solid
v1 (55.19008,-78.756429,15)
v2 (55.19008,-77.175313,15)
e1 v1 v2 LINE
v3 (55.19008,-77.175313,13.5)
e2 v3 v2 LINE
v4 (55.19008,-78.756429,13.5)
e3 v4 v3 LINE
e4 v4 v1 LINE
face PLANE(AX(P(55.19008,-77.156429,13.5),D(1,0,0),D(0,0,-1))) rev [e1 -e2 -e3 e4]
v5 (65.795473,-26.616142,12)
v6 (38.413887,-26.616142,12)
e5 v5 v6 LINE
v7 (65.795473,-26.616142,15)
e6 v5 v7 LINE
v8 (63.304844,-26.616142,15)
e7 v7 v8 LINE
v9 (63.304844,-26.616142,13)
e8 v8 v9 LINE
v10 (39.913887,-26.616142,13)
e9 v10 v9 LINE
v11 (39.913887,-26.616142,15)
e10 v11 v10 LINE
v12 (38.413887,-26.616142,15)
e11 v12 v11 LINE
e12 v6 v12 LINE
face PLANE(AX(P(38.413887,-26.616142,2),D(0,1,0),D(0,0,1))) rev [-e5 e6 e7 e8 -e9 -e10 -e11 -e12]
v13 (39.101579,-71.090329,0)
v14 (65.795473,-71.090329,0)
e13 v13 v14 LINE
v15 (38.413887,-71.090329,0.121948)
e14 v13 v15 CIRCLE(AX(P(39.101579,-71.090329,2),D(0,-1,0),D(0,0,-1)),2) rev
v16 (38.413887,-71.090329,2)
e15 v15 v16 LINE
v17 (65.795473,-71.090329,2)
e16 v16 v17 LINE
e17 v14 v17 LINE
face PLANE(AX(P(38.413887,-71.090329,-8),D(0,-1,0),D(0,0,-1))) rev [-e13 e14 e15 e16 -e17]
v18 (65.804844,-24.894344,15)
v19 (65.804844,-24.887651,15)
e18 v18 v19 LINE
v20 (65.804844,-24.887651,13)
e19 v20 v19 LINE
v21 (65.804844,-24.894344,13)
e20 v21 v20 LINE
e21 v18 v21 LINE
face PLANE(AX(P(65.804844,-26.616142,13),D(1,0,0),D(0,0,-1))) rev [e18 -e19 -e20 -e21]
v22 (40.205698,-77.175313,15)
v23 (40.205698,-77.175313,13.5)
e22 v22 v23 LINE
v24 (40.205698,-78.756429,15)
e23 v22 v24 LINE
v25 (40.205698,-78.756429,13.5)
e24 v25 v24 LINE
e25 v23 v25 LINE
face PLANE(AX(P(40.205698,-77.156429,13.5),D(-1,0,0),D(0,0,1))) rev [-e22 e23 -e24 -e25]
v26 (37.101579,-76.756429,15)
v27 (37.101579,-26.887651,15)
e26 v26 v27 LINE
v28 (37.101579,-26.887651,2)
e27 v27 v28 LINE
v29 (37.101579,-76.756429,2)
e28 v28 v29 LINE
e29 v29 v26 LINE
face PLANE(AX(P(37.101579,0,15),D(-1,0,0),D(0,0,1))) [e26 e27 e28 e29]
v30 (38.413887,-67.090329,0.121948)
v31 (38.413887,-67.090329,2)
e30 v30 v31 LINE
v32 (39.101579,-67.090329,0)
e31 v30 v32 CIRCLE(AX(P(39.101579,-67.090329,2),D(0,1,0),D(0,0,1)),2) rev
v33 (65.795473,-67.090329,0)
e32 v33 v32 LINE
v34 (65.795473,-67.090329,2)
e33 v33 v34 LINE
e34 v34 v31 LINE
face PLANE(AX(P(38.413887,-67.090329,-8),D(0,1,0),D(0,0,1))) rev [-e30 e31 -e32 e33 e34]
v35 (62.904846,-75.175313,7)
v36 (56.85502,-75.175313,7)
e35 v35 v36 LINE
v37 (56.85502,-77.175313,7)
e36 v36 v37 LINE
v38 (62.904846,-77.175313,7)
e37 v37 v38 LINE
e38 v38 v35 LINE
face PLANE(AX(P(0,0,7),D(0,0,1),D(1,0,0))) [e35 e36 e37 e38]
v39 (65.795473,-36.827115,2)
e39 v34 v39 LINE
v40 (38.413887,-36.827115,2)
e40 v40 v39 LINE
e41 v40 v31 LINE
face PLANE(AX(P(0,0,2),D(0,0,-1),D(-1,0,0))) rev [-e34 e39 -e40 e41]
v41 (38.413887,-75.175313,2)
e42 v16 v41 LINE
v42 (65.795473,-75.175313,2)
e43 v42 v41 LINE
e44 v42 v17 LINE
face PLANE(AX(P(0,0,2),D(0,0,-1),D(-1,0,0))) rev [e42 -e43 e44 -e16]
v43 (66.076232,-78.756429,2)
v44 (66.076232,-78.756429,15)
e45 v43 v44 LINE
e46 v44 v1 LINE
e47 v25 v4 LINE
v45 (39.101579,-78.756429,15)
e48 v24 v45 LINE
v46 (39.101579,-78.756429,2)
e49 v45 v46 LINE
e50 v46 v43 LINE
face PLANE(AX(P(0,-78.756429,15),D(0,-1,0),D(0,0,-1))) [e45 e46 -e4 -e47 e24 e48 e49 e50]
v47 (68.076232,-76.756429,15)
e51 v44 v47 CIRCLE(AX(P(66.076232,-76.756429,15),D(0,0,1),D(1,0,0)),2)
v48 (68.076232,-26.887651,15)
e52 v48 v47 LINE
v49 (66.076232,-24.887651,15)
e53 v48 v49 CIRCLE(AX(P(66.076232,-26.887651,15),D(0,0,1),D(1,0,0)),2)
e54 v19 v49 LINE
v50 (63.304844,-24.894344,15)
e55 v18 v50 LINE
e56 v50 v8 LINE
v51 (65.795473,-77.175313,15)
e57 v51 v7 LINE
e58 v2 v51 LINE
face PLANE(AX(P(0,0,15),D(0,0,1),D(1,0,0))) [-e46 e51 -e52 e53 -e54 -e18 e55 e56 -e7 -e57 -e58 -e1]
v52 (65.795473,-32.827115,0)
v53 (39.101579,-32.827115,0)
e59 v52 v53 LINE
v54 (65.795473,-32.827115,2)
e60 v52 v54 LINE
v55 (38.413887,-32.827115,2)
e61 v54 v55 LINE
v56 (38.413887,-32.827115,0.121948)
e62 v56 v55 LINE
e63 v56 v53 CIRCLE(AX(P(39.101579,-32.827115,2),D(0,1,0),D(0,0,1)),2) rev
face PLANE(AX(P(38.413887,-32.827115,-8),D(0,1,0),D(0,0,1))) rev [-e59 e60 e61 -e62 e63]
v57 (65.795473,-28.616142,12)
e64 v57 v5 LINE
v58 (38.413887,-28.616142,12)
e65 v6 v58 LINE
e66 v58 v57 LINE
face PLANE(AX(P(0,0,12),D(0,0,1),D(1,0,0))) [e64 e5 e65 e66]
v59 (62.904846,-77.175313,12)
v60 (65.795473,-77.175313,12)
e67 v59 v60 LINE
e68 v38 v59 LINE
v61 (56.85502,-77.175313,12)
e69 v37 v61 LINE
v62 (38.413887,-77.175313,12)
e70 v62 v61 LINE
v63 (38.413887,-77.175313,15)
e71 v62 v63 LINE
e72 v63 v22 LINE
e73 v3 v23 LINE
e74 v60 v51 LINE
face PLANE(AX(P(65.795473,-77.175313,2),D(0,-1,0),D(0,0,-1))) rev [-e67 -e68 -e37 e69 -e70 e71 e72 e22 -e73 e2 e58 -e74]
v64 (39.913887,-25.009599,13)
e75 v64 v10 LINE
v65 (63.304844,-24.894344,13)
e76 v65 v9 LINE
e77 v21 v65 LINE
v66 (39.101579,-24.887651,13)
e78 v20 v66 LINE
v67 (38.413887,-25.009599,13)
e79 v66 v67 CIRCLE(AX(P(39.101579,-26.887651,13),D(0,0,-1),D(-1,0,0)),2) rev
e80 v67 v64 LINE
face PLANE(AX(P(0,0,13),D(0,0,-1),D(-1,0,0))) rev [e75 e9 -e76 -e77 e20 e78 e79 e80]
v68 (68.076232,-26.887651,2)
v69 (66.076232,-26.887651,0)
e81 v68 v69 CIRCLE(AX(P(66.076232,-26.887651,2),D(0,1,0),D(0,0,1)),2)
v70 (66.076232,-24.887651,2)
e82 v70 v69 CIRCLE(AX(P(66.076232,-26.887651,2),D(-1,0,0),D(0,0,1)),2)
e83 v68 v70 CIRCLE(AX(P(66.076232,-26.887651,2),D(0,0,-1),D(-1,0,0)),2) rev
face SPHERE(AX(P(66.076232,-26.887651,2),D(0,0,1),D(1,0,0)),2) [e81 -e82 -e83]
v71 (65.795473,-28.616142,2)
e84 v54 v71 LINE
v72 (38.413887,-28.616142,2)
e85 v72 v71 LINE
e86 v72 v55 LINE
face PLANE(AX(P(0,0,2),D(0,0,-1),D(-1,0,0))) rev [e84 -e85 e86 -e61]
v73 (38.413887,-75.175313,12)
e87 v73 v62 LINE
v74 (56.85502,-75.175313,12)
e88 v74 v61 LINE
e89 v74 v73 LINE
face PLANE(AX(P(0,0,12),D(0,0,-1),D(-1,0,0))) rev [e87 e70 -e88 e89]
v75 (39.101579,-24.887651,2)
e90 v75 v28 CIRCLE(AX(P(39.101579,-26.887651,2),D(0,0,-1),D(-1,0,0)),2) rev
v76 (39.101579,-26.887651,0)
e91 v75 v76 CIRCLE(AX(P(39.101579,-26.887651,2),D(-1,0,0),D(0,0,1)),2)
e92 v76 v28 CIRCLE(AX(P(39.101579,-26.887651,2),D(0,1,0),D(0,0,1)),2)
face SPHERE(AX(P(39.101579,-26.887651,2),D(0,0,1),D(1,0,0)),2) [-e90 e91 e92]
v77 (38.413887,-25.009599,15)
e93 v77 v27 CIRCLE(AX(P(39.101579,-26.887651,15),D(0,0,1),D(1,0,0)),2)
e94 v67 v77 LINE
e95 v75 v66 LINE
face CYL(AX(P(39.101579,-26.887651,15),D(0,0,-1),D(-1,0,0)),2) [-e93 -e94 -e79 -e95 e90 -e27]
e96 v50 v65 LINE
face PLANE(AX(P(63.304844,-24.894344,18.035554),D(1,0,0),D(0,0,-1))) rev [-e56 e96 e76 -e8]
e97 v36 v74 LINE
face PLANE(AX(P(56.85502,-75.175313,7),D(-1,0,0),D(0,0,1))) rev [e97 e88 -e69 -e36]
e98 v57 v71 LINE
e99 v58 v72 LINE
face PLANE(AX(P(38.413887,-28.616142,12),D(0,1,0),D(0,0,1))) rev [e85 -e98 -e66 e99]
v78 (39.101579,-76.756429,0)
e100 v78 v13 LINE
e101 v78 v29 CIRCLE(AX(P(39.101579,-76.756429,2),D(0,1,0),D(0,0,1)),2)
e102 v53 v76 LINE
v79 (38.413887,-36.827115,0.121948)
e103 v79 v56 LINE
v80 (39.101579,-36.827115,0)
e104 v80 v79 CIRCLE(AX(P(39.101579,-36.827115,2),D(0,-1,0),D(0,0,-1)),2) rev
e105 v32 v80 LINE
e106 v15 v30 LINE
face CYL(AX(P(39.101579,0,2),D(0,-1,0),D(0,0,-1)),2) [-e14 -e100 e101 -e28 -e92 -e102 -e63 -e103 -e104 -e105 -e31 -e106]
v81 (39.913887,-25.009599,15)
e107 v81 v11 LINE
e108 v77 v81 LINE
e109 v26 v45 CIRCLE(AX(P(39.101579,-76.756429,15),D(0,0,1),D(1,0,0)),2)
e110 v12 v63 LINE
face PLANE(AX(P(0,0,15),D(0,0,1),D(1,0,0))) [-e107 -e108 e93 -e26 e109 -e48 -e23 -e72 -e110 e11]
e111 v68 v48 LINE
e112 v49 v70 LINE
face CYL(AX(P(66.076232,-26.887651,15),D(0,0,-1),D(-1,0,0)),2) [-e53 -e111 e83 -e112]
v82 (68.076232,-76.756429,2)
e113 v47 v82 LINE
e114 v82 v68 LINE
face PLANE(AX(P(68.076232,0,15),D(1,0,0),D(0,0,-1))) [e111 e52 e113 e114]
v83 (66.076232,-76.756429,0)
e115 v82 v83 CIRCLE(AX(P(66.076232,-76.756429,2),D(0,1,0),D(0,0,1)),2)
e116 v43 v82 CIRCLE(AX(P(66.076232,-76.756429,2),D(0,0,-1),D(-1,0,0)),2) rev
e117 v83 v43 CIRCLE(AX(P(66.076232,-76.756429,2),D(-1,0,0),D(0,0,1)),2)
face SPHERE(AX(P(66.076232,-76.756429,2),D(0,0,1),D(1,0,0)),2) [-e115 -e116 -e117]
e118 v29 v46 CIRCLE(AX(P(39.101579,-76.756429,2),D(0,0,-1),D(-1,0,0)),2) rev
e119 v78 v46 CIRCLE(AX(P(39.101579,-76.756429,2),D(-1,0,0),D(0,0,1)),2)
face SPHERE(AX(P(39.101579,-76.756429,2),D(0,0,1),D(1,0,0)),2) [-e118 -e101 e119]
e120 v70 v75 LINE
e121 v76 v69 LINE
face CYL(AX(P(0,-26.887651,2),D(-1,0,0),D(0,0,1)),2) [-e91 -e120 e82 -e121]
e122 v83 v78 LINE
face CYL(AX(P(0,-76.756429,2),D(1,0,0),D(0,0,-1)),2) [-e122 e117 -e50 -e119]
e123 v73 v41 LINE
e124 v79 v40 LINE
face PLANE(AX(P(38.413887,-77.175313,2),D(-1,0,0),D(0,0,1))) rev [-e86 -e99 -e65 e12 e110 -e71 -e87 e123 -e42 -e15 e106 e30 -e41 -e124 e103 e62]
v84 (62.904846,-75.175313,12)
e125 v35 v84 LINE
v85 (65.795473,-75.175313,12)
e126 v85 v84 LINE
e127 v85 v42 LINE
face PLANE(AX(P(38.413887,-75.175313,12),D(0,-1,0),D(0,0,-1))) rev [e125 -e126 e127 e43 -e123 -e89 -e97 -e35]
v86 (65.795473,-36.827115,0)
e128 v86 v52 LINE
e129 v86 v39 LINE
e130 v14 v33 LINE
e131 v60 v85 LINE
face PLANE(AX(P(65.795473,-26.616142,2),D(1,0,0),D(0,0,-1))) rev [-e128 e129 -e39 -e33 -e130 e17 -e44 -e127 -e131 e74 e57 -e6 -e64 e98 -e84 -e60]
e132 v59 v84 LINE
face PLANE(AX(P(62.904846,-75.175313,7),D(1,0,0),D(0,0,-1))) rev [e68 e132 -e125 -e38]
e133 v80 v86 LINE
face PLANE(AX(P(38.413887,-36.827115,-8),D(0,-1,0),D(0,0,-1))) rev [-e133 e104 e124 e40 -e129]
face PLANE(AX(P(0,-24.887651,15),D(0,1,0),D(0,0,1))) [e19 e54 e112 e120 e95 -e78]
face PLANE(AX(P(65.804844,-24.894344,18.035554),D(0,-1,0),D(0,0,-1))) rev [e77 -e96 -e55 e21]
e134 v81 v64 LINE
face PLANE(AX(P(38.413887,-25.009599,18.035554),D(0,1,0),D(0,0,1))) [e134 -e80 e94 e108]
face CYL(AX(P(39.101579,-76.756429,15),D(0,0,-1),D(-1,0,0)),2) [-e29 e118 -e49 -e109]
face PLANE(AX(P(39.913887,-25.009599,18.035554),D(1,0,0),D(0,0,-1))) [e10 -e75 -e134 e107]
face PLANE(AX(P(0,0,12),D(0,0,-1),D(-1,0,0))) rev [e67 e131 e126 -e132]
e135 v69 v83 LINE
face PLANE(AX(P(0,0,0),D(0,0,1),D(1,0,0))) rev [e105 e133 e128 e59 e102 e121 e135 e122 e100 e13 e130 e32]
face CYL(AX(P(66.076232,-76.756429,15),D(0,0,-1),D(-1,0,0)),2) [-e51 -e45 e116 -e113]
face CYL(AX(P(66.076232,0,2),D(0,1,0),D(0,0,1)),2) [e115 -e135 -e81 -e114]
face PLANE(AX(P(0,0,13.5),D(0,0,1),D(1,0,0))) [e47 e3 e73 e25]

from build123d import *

# Parameters (mm, degrees)
SKETCH_3_W          = 30.97465329
SKETCH_3_H          = 53.868777402
EXTRUDE_1_DEPTH     = 15
SKETCH_5_W          = 27.381586342
SKETCH_5_H          = 50.559171176
CUT_EXTRUDE_1_DEPTH = 13
SKETCH_6_W          = 27.381586342
SKETCH_6_H          = 2
EXTRUDE_2_DEPTH     = 10
SKETCH_9_W          = 27.390957387
SKETCH_9_H          = 1.728490609
CUT_EXTRUDE_3_DEPTH = 2
FILLET_1_R          = 2
SKETCH_11_W         = 27.381586342
SKETCH_11_H         = 4
CUT_EXTRUDE_4_DEPTH = 10
SKETCH_12_W         = 6.049826212
SKETCH_12_H         = 2
CUT_EXTRUDE_5_DEPTH = 5
SKETCH_14_W         = 1.5
SKETCH_14_H         = 1.606542801
SKETCH_14_W_2       = 2.5
SKETCH_14_H_2       = 1.721797648
EXTRUDE_3_DEPTH     = 2
SKETCH_17_W         = 14.984382514
SKETCH_17_H         = 1.6
CUT_EXTRUDE_8_DEPTH = 1.5
FILLET_2_R          = 2


with BuildPart() as part:
    # 草图3 → 凸台-拉伸1 (new body)
    with BuildSketch(Plane.XY):
        with Locations((52.588905184, -51.822040042)):
            Rectangle(SKETCH_3_W, SKETCH_3_H)
    extrude(amount=EXTRUDE_1_DEPTH)

    # 草图5 → 切除-拉伸1 (cut)
    with BuildSketch(Plane.XY.offset(15)):
        with Locations((52.104679946, -51.895727538)):
            Rectangle(SKETCH_5_W, SKETCH_5_H)
    extrude(amount=-CUT_EXTRUDE_1_DEPTH, mode=Mode.SUBTRACT)

    # 草图6 → 凸台-拉伸2 (add)
    with BuildSketch(Plane.XY.offset(2)):
        with Locations((52.104679946, -27.61614195)):
            Rectangle(SKETCH_6_W, SKETCH_6_H)
        with Locations((52.104679946, -76.175313126)):
            Rectangle(SKETCH_6_W, SKETCH_6_H)
    extrude(amount=EXTRUDE_2_DEPTH)

    # 草图9 → 切除-拉伸3 (cut)
    with BuildSketch(Plane.XY.offset(15)):
        with Locations((52.109365469, -25.751896646)):
            Rectangle(SKETCH_9_W, SKETCH_9_H)
    extrude(amount=-CUT_EXTRUDE_3_DEPTH, mode=Mode.SUBTRACT)

    # 圆角1
    fillet_1_edges = [part.edges().sort_by_distance(p)[0] for p in [
        (68.076231829, -78.756428743, 7.5),
        (37.101578539, -78.756428743, 7.5),
        (37.101578539, -24.887651341, 7.5),
        (68.076231829, -24.887651341, 7.5),
    ]]
    fillet(fillet_1_edges, radius=FILLET_1_R)

    # 草图11 → 切除-拉伸4 (cut)
    with BuildSketch(Plane.XY.offset(2)):
        with Locations((52.104679946, -34.827114549)):
            Rectangle(SKETCH_11_W, SKETCH_11_H)
        with Locations((52.104679946, -69.090328525)):
            Rectangle(SKETCH_11_W, SKETCH_11_H)
    extrude(amount=-CUT_EXTRUDE_4_DEPTH, mode=Mode.SUBTRACT)

    # 草图12 → 切除-拉伸5 (cut)
    with BuildSketch(Plane.XY.offset(12)):
        with Locations((59.879933224, -76.175313126)):
            Rectangle(SKETCH_12_W, SKETCH_12_H)
    extrude(amount=-CUT_EXTRUDE_5_DEPTH, mode=Mode.SUBTRACT)

    # 草图14 → 凸台-拉伸3 (add)
    with BuildSketch(Plane.XY.offset(13)):
        with Locations((39.163886775, -25.81287055)):
            Rectangle(SKETCH_14_W, SKETCH_14_H)
        with Locations((64.554844162, -25.755243126)):
            Rectangle(SKETCH_14_W_2, SKETCH_14_H_2)
    extrude(amount=EXTRUDE_3_DEPTH)

    # 草图17 → 切除-拉伸8 (cut)
    with BuildSketch(Plane.XY.offset(15)):
        with Locations((47.697888967, -77.956428743)):
            Rectangle(SKETCH_17_W, SKETCH_17_H)
    extrude(amount=-CUT_EXTRUDE_8_DEPTH, mode=Mode.SUBTRACT)

    # 圆角2
    # the kernel refuses this fillet: 2 mm, written as the material it takes off along each edge
    with BuildSketch(Plane(origin=(39.101578539, -26.887651341, 0), x_dir=(0, 1, 0), z_dir=(1, 0, 0))) as fillet_2_piece_1:
        with BuildLine():
            CenterArc((2 - FILLET_2_R, FILLET_2_R), FILLET_2_R, 270, 90)
            Line((2, FILLET_2_R), (2, 0))
            Line((2, 0), (2 - FILLET_2_R, 0))
        make_face()
    revolve(axis=Axis((39.101578539, -26.887651341, 0), (0, 0, 1)), revolution_arc=90, mode=Mode.SUBTRACT)
    with BuildSketch(Plane(origin=(37.101578539, -76.756428743, 0), x_dir=(1, 0, 0), z_dir=(0, 1, 0)), Plane(origin=(68.076231829, -26.887651341, 0), x_dir=(-1, 0, 0), z_dir=(0, -1, 0))) as fillet_2_piece_2:
        with BuildLine():
            CenterArc((FILLET_2_R, -FILLET_2_R), FILLET_2_R, 90, 90)
            Line((0, -FILLET_2_R), (0, 0))
            Line((0, 0), (FILLET_2_R, 0))
        make_face()
    extrude(amount=49.868777401, mode=Mode.SUBTRACT)
    with BuildSketch(Plane(origin=(39.101578539, -76.756428743, 0), x_dir=(-1, 0, 0), z_dir=(0, 1, 0))) as fillet_2_piece_3:
        with BuildLine():
            CenterArc((2 - FILLET_2_R, FILLET_2_R), FILLET_2_R, 270, 90)
            Line((2, FILLET_2_R), (2, 0))
            Line((2, 0), (2 - FILLET_2_R, 0))
        make_face()
    revolve(axis=Axis((39.101578539, -76.756428743, 0), (0, 0, 1)), revolution_arc=90, mode=Mode.SUBTRACT)
    with BuildSketch(Plane(origin=(66.076231829, -78.756428743, 0), x_dir=(0, 1, 0), z_dir=(-1, 0, 0))) as fillet_2_piece_4:
        with BuildLine():
            CenterArc((FILLET_2_R, -FILLET_2_R), FILLET_2_R, 90, 90)
            Line((0, -FILLET_2_R), (0, 0))
            Line((0, 0), (FILLET_2_R, 0))
        make_face()
    extrude(amount=26.974653289, mode=Mode.SUBTRACT)
    with BuildSketch(Plane(origin=(66.076231829, -76.756428743, 0), x_dir=(0, -1, 0), z_dir=(-1, 0, 0))) as fillet_2_piece_5:
        with BuildLine():
            CenterArc((2 - FILLET_2_R, FILLET_2_R), FILLET_2_R, 270, 90)
            Line((2, FILLET_2_R), (2, 0))
            Line((2, 0), (2 - FILLET_2_R, 0))
        make_face()
    revolve(axis=Axis((66.076231829, -76.756428743, 0), (0, 0, 1)), revolution_arc=90, mode=Mode.SUBTRACT)
    with BuildSketch(Plane(origin=(66.076231829, -26.887651341, 0), x_dir=(0, 1, 0), z_dir=(-1, 0, 0))) as fillet_2_piece_6:
        with BuildLine():
            CenterArc((2 - FILLET_2_R, -FILLET_2_R), FILLET_2_R, 0, 90)
            Line((2, -FILLET_2_R), (2, 0))
            Line((2, 0), (2 - FILLET_2_R, 0))
        make_face()
    revolve(axis=Axis((66.076231829, -26.887651341, 0), (0, 0, -1)), revolution_arc=90, mode=Mode.SUBTRACT)
    with BuildSketch(Plane(origin=(39.101578539, -24.887651341, 0), x_dir=(0, 0, 1), z_dir=(1, 0, 0))) as fillet_2_piece_7:
        with BuildLine():
            CenterArc((FILLET_2_R, FILLET_2_R), FILLET_2_R, 180, 90)
            Line((0, FILLET_2_R), (0, 0))
            Line((0, 0), (FILLET_2_R, 0))
        make_face()
    extrude(amount=26.974653289, mode=Mode.SUBTRACT)


solid = part.part
